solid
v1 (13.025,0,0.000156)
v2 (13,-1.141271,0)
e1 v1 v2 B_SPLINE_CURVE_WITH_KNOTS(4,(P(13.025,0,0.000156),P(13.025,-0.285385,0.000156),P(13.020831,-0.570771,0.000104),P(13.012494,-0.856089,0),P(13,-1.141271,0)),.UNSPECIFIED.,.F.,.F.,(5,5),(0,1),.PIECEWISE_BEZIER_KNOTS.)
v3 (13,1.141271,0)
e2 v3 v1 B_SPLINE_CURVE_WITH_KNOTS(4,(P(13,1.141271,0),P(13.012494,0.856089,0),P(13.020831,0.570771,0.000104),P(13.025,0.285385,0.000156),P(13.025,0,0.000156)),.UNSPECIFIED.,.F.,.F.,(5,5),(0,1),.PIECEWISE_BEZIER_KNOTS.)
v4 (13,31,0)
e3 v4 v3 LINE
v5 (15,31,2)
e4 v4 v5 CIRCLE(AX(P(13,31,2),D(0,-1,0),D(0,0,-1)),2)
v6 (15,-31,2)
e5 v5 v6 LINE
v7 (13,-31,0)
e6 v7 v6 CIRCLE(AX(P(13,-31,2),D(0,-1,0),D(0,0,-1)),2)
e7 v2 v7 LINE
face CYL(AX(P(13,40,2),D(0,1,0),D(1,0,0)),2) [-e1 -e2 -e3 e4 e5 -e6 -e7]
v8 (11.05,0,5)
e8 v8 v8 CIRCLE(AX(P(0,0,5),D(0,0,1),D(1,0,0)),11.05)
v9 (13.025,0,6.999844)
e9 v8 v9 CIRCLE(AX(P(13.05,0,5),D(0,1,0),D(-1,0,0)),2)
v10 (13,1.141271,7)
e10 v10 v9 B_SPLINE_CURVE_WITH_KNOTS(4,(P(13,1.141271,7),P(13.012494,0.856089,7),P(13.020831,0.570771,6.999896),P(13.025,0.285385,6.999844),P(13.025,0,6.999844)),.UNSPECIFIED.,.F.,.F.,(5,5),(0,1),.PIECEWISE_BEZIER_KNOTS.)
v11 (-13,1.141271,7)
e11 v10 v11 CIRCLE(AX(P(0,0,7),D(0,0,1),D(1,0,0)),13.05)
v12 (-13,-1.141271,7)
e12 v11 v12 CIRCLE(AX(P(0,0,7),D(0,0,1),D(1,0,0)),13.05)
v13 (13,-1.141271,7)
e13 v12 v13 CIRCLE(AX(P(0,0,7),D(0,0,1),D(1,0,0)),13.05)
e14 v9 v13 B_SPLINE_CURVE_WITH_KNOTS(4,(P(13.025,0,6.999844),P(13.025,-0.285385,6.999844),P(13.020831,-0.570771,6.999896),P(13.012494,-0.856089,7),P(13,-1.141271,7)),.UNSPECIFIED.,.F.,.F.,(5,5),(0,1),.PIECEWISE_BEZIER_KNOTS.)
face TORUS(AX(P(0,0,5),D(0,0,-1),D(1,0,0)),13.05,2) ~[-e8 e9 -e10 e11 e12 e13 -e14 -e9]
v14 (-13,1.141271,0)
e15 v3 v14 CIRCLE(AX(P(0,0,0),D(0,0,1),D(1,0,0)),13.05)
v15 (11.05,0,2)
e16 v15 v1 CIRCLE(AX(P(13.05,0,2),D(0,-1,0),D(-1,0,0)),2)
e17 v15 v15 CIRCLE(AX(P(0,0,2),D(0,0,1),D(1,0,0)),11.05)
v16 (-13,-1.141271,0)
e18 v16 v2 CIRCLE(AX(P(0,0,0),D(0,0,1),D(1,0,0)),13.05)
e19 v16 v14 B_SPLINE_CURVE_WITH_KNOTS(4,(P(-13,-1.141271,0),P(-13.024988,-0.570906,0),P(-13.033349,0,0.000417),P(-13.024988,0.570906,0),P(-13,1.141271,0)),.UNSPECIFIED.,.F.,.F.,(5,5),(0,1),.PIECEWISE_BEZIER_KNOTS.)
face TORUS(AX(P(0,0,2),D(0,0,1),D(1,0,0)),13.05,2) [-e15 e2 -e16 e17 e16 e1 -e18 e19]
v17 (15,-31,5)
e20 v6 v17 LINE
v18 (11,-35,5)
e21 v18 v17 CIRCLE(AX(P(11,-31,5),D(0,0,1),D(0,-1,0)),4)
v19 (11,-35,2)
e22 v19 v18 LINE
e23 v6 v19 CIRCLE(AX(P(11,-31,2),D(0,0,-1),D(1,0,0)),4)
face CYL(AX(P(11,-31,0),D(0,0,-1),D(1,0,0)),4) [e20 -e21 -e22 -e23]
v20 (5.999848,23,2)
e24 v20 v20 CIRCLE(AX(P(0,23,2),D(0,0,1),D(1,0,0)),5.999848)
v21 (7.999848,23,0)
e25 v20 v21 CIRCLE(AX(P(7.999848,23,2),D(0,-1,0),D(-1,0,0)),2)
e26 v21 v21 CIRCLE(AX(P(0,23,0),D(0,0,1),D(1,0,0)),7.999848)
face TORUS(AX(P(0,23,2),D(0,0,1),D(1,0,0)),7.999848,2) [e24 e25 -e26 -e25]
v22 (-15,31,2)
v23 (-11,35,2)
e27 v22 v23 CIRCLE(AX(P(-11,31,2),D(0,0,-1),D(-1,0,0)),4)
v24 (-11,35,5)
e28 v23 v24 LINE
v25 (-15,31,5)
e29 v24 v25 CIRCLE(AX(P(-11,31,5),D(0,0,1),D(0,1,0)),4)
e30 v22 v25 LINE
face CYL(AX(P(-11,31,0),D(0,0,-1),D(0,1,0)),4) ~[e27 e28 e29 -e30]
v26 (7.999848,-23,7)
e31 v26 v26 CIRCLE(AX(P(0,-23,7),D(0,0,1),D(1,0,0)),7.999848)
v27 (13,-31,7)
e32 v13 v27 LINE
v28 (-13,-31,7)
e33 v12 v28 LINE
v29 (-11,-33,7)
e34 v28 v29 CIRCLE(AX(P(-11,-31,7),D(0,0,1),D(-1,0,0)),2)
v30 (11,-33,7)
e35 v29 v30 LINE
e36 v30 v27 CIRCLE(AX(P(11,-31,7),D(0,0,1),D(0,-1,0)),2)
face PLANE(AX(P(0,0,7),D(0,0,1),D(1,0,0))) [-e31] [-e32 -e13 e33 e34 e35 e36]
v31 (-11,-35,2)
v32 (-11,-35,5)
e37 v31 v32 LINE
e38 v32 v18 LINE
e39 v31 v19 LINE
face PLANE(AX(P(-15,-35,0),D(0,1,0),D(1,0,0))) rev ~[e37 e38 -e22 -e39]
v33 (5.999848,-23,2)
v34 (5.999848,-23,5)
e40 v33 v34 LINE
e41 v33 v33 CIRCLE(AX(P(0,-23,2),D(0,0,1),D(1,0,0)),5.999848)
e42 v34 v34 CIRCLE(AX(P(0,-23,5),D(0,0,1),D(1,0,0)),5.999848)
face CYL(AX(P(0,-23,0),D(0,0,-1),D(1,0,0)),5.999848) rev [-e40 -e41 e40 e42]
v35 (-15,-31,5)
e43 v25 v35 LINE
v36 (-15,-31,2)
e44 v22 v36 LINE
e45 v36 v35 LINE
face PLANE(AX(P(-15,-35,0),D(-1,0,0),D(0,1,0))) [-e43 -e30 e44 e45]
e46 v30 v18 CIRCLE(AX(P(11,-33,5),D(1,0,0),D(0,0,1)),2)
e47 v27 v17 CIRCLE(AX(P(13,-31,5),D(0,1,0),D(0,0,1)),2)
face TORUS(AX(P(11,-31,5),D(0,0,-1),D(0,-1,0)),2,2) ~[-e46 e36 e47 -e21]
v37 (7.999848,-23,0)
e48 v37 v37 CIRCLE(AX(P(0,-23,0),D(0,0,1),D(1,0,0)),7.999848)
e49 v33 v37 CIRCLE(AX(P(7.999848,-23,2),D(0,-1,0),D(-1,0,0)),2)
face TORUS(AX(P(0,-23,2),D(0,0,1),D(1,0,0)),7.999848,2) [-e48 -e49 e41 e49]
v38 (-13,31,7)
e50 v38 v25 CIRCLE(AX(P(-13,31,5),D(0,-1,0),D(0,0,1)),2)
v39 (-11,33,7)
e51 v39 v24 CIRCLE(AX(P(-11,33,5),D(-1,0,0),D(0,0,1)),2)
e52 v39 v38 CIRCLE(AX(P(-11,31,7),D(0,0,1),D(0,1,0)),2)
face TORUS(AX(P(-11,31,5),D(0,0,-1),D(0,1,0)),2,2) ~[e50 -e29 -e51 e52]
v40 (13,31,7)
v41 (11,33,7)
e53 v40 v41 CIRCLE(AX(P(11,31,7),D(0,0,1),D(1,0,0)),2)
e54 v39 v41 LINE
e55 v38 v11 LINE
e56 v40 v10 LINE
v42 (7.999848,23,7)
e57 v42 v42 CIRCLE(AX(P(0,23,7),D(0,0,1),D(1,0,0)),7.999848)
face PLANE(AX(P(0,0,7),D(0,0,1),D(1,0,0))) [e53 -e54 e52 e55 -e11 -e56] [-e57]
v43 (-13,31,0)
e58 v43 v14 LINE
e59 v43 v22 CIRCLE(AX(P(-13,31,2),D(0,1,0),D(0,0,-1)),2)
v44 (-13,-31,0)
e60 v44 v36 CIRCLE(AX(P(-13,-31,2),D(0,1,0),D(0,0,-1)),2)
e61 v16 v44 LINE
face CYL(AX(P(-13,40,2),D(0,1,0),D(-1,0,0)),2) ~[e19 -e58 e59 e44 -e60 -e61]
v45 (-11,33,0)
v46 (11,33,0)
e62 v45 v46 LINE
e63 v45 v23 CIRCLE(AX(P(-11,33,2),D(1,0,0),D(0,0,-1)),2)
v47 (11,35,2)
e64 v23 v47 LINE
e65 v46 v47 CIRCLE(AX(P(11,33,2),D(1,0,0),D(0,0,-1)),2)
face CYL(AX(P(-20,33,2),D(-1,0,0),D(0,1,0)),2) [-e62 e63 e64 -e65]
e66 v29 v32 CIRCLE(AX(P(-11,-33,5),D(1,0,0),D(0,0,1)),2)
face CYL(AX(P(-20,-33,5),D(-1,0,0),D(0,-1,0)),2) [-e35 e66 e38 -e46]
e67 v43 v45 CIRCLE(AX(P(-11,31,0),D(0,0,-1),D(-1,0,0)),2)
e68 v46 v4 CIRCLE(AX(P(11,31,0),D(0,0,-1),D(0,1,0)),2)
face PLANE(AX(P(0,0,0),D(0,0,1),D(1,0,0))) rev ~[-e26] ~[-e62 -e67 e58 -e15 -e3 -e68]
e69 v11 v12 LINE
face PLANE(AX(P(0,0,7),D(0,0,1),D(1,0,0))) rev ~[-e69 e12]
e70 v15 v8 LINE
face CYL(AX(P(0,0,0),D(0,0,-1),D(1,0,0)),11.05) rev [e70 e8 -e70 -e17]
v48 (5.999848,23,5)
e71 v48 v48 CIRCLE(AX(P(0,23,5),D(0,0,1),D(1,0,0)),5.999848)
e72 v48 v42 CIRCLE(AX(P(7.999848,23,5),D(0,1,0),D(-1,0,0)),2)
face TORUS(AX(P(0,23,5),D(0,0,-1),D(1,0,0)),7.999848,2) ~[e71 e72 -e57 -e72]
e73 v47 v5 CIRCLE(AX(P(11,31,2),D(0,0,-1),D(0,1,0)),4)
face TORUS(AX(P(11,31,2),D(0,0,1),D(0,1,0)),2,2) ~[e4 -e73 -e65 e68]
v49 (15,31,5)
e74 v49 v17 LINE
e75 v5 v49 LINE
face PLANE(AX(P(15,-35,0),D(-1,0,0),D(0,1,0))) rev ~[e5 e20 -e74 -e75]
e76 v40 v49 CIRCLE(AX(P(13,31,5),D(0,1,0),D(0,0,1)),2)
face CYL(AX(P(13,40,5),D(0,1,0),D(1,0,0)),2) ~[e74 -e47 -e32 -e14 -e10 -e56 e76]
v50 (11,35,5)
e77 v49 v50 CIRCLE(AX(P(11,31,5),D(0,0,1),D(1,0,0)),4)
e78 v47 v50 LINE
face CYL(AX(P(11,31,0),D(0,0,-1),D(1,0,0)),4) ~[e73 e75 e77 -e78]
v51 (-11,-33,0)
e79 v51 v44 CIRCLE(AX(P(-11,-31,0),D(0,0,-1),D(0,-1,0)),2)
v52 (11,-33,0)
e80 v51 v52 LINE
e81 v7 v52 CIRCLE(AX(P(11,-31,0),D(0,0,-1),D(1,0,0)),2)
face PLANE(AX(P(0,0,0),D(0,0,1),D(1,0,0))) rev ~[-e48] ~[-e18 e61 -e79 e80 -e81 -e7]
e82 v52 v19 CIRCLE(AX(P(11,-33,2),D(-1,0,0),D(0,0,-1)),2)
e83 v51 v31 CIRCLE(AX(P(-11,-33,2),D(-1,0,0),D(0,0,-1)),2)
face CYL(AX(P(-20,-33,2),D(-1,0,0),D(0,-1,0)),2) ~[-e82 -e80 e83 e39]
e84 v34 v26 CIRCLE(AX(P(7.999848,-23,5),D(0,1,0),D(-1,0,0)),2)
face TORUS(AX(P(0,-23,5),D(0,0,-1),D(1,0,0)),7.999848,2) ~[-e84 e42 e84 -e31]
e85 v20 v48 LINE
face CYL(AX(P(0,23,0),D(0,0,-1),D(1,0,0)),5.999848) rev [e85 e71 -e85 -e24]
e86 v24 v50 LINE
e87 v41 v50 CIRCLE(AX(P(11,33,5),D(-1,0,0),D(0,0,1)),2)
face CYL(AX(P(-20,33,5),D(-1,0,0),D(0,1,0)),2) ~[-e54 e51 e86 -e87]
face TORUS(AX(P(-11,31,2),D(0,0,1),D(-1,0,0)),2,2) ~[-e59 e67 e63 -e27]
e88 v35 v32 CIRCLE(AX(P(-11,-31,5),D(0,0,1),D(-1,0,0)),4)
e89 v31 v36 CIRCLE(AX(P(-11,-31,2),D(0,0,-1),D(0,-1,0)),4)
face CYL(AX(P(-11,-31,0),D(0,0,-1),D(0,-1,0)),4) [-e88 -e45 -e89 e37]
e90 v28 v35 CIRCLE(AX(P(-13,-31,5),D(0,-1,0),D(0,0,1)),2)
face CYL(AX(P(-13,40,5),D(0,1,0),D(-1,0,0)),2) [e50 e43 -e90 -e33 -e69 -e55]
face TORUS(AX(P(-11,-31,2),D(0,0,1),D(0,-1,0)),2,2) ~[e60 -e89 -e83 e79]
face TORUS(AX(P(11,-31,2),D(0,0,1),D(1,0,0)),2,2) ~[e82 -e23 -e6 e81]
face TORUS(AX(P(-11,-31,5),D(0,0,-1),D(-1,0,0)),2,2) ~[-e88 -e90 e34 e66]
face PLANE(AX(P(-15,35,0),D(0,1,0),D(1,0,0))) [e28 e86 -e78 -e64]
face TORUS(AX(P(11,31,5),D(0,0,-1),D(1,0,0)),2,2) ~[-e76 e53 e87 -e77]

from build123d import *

# Parameters (mm, degrees)
F0_W         = 30
F0_H         = 70
F0_R         = 5.9998479486
F0_R_2       = 11.05
F1_DEPTH     = 7
F2_T1_DEPTH  = 80
F2_T3_DEPTH  = 40
F3_T1_DEPTH  = 6.9999999998
F3_T4_ANGLE  = 90
F3_T6_ANGLE  = 90
F3_T8_ANGLE  = 90
F3_T10_ANGLE = 90
F3_T12_ANGLE = 90
F3_T14_ANGLE = 90
F3_T16_ANGLE = 90
F3_T18_ANGLE = 90


# Not quite as in the source:
# - a fillet or chamfer that OpenCascade refuses, or shapes differently, is made with other operations: its cross-section is extruded or revolved along the edge and cut away or added


with BuildPart() as f1:
    # F0 (on Top) → F1 (new body)
    with BuildSketch(Plane.XY):
        Rectangle(F0_W, F0_H)
        with Locations((0, -23)):
            Circle(F0_R, mode=Mode.SUBTRACT)
        Circle(F0_R_2, mode=Mode.SUBTRACT)
        with Locations((0, 23)):
            Circle(F0_R, mode=Mode.SUBTRACT)
    extrude(amount=F1_DEPTH)

    # F2: fillet of radius 2 on 14 edges, made by hand

    # F2_s2 → F2_t1 (cut)
    with BuildSketch(Plane.XZ.offset(-40)):
        with BuildLine():
            ThreePointArc((15, 5), (14.4142135624, 6.4142135624), (13, 7))
            Line((13, 7), (15, 7))
            Line((15, 7), (15, 5))
        make_face()
        with BuildLine():
            ThreePointArc((-15, 5), (-14.4142135624, 6.4142135624), (-13, 7))
            Line((-13, 7), (-15, 7))
            Line((-15, 7), (-15, 5))
        make_face()
        with BuildLine():
            ThreePointArc((15, 2), (14.4142135624, 0.5857864376), (13, 0))
            Line((13, 0), (15, 0))
            Line((15, 0), (15, 2))
        make_face()
        with BuildLine():
            ThreePointArc((-15, 2), (-14.4142135624, 0.5857864376), (-13, 0))
            Line((-13, 0), (-15, 0))
            Line((-15, 0), (-15, 2))
        make_face()
    extrude(amount=F2_T1_DEPTH, mode=Mode.SUBTRACT)

    # F2_s4 → F2_t3 (cut)
    with BuildSketch(Plane.YZ.offset(-20)):
        with BuildLine():
            ThreePointArc((35, 5), (34.4142135624, 6.4142135624), (33, 7))
            Line((33, 7), (35, 7))
            Line((35, 7), (35, 5))
        make_face()
        with BuildLine():
            ThreePointArc((-35, 5), (-34.4142135624, 6.4142135624), (-33, 7))
            Line((-33, 7), (-35, 7))
            Line((-35, 7), (-35, 5))
        make_face()
        with BuildLine():
            ThreePointArc((35, 2), (34.4142135624, 0.5857864376), (33, 0))
            Line((33, 0), (35, 0))
            Line((35, 0), (35, 2))
        make_face()
        with BuildLine():
            ThreePointArc((-35, 2), (-34.4142135624, 0.5857864376), (-33, 0))
            Line((-33, 0), (-35, 0))
            Line((-35, 0), (-35, 2))
        make_face()
    extrude(amount=F2_T3_DEPTH, mode=Mode.SUBTRACT)

    # F2_s5 → F2_t6 (revolve, cut)
    with BuildSketch(Plane.XZ.offset(23)):
        with BuildLine():
            ThreePointArc((5.9998479486, 5), (6.5856343863, 6.4142135624), (7.9998479486, 7))
            Line((7.9998479486, 7), (5.9998479486, 7))
            Line((5.9998479486, 7), (5.9998479486, 5))
        make_face()
    revolve(axis=Axis((0, -23, 7), (0, 0, 1)), mode=Mode.SUBTRACT)

    # F2_s7 → F2_t8 (revolve, cut)
    with BuildSketch(Plane.XZ):
        with BuildLine():
            ThreePointArc((11.05, 5), (11.6357864376, 6.4142135624), (13.05, 7))
            Line((13.05, 7), (11.05, 7))
            Line((11.05, 7), (11.05, 5))
        make_face()
    revolve(axis=Axis((0, 0, 7), (0, 0, 1)), mode=Mode.SUBTRACT)

    # F2_s9 → F2_t10 (revolve, cut)
    with BuildSketch(Plane.XZ.offset(-23)):
        with BuildLine():
            ThreePointArc((5.9998479486, 5), (6.5856343863, 6.4142135624), (7.9998479486, 7))
            Line((7.9998479486, 7), (5.9998479486, 7))
            Line((5.9998479486, 7), (5.9998479486, 5))
        make_face()
    revolve(axis=Axis((0, 23, 7), (0, 0, 1)), mode=Mode.SUBTRACT)

    # F2_s11 → F2_t12 (revolve, cut)
    with BuildSketch(Plane.XZ.offset(23)):
        with BuildLine():
            ThreePointArc((5.9998479486, 2), (6.5856343863, 0.5857864376), (7.9998479486, 0))
            Line((7.9998479486, 0), (5.9998479486, 0))
            Line((5.9998479486, 0), (5.9998479486, 2))
        make_face()
    revolve(axis=Axis((0, -23, 0), (0, 0, 1)), mode=Mode.SUBTRACT)

    # F2_s13 → F2_t14 (revolve, cut)
    with BuildSketch(Plane.XZ):
        with BuildLine():
            ThreePointArc((11.05, 2), (11.6357864376, 0.5857864376), (13.05, 0))
            Line((13.05, 0), (11.05, 0))
            Line((11.05, 0), (11.05, 2))
        make_face()
    revolve(axis=Axis((0, 0, 0), (0, 0, 1)), mode=Mode.SUBTRACT)

    # F2_s15 → F2_t16 (revolve, cut)
    with BuildSketch(Plane.XZ.offset(-23)):
        with BuildLine():
            ThreePointArc((5.9998479486, 2), (6.5856343863, 0.5857864376), (7.9998479486, 0))
            Line((7.9998479486, 0), (5.9998479486, 0))
            Line((5.9998479486, 0), (5.9998479486, 2))
        make_face()
    revolve(axis=Axis((0, 23, 0), (0, 0, 1)), mode=Mode.SUBTRACT)

    # F3: fillet of radius 4 on 4 edges, made by hand

    # F3_s2 → F3_t1 (cut)
    with BuildSketch(Plane.XY):
        with BuildLine():
            ThreePointArc((-11, -35), (-13.8284271247, -33.8284271247), (-15, -31))
            Line((-15, -31), (-15, -35))
            Line((-15, -35), (-11, -35))
        make_face()
        with BuildLine():
            ThreePointArc((15, -31), (13.8284271247, -33.8284271247), (11, -35))
            Line((11, -35), (15, -35))
            Line((15, -35), (15, -31))
        make_face()
        with BuildLine():
            ThreePointArc((15, 31), (13.8284271247, 33.8284271247), (11, 35))
            Line((11, 35), (15, 35))
            Line((15, 35), (15, 31))
        make_face()
        with BuildLine():
            ThreePointArc((-11, 35), (-13.8284271247, 33.8284271247), (-15, 31))
            Line((-15, 31), (-15, 35))
            Line((-15, 35), (-11, 35))
        make_face()
    extrude(amount=F3_T1_DEPTH, mode=Mode.SUBTRACT)

    # F3_s3 → F3_t4 (revolve, cut)
    with BuildSketch(Plane.XZ.offset(-31)):
        with BuildLine():
            ThreePointArc((-13.0000000001, 0), (-14.4142135624, 0.5857864376), (-15, 1.9999999999))
            Line((-15, 1.9999999999), (-15, 0))
            Line((-15, 0), (-13.0000000001, 0))
        make_face()
    revolve(axis=Axis((-11, 31, 0), (0, 0, -1)), revolution_arc=F3_T4_ANGLE, mode=Mode.SUBTRACT)

    # F3_s5 → F3_t6 (revolve, cut)
    with BuildSketch(Plane.YZ.offset(-11)):
        with BuildLine():
            ThreePointArc((33.0000000001, 7), (34.4142135624, 6.4142135624), (35, 5.0000000001))
            Line((35, 5.0000000001), (35, 7))
            Line((35, 7), (33.0000000001, 7))
        make_face()
    revolve(axis=Axis((-11, 31, 7), (0, 0, 1)), revolution_arc=F3_T6_ANGLE, mode=Mode.SUBTRACT)

    # F3_s7 → F3_t8 (revolve, cut)
    with BuildSketch(Plane.YZ.offset(11)):
        with BuildLine():
            ThreePointArc((33.0000000001, 0), (34.4142135624, 0.5857864376), (35, 1.9999999999))
            Line((35, 1.9999999999), (35, 0))
            Line((35, 0), (33.0000000001, 0))
        make_face()
    revolve(axis=Axis((11, 31, 0), (0, 0, -1)), revolution_arc=F3_T8_ANGLE, mode=Mode.SUBTRACT)

    # F3_s9 → F3_t10 (revolve, cut)
    with BuildSketch(Plane.XZ.offset(-31)):
        with BuildLine():
            ThreePointArc((13.0000000001, 7), (14.4142135624, 6.4142135624), (15, 5.0000000001))
            Line((15, 5.0000000001), (15, 7))
            Line((15, 7), (13.0000000001, 7))
        make_face()
    revolve(axis=Axis((11, 31, 7), (0, 0, 1)), revolution_arc=F3_T10_ANGLE, mode=Mode.SUBTRACT)

    # F3_s11 → F3_t12 (revolve, cut)
    with BuildSketch(Plane.XZ.offset(31)):
        with BuildLine():
            ThreePointArc((13.0000000001, 0), (14.4142135624, 0.5857864376), (15, 1.9999999999))
            Line((15, 1.9999999999), (15, 0))
            Line((15, 0), (13.0000000001, 0))
        make_face()
    revolve(axis=Axis((11, -31, 0), (0, 0, -1)), revolution_arc=F3_T12_ANGLE, mode=Mode.SUBTRACT)

    # F3_s13 → F3_t14 (revolve, cut)
    with BuildSketch(Plane.YZ.offset(11)):
        with BuildLine():
            ThreePointArc((-33.0000000001, 7), (-34.4142135624, 6.4142135624), (-35, 5.0000000001))
            Line((-35, 5.0000000001), (-35, 7))
            Line((-35, 7), (-33.0000000001, 7))
        make_face()
    revolve(axis=Axis((11, -31, 7), (0, 0, 1)), revolution_arc=F3_T14_ANGLE, mode=Mode.SUBTRACT)

    # F3_s15 → F3_t16 (revolve, cut)
    with BuildSketch(Plane.YZ.offset(-11)):
        with BuildLine():
            ThreePointArc((-33.0000000001, 0), (-34.4142135624, 0.5857864376), (-35, 1.9999999999))
            Line((-35, 1.9999999999), (-35, 0))
            Line((-35, 0), (-33.0000000001, 0))
        make_face()
    revolve(axis=Axis((-11, -31, 0), (0, 0, -1)), revolution_arc=F3_T16_ANGLE, mode=Mode.SUBTRACT)

    # F3_s17 → F3_t18 (revolve, cut)
    with BuildSketch(Plane.XZ.offset(31)):
        with BuildLine():
            ThreePointArc((-13.0000000001, 7), (-14.4142135624, 6.4142135624), (-15, 5.0000000001))
            Line((-15, 5.0000000001), (-15, 7))
            Line((-15, 7), (-13.0000000001, 7))
        make_face()
    revolve(axis=Axis((-11, -31, 7), (0, 0, 1)), revolution_arc=F3_T18_ANGLE, mode=Mode.SUBTRACT)


solid = f1.part
